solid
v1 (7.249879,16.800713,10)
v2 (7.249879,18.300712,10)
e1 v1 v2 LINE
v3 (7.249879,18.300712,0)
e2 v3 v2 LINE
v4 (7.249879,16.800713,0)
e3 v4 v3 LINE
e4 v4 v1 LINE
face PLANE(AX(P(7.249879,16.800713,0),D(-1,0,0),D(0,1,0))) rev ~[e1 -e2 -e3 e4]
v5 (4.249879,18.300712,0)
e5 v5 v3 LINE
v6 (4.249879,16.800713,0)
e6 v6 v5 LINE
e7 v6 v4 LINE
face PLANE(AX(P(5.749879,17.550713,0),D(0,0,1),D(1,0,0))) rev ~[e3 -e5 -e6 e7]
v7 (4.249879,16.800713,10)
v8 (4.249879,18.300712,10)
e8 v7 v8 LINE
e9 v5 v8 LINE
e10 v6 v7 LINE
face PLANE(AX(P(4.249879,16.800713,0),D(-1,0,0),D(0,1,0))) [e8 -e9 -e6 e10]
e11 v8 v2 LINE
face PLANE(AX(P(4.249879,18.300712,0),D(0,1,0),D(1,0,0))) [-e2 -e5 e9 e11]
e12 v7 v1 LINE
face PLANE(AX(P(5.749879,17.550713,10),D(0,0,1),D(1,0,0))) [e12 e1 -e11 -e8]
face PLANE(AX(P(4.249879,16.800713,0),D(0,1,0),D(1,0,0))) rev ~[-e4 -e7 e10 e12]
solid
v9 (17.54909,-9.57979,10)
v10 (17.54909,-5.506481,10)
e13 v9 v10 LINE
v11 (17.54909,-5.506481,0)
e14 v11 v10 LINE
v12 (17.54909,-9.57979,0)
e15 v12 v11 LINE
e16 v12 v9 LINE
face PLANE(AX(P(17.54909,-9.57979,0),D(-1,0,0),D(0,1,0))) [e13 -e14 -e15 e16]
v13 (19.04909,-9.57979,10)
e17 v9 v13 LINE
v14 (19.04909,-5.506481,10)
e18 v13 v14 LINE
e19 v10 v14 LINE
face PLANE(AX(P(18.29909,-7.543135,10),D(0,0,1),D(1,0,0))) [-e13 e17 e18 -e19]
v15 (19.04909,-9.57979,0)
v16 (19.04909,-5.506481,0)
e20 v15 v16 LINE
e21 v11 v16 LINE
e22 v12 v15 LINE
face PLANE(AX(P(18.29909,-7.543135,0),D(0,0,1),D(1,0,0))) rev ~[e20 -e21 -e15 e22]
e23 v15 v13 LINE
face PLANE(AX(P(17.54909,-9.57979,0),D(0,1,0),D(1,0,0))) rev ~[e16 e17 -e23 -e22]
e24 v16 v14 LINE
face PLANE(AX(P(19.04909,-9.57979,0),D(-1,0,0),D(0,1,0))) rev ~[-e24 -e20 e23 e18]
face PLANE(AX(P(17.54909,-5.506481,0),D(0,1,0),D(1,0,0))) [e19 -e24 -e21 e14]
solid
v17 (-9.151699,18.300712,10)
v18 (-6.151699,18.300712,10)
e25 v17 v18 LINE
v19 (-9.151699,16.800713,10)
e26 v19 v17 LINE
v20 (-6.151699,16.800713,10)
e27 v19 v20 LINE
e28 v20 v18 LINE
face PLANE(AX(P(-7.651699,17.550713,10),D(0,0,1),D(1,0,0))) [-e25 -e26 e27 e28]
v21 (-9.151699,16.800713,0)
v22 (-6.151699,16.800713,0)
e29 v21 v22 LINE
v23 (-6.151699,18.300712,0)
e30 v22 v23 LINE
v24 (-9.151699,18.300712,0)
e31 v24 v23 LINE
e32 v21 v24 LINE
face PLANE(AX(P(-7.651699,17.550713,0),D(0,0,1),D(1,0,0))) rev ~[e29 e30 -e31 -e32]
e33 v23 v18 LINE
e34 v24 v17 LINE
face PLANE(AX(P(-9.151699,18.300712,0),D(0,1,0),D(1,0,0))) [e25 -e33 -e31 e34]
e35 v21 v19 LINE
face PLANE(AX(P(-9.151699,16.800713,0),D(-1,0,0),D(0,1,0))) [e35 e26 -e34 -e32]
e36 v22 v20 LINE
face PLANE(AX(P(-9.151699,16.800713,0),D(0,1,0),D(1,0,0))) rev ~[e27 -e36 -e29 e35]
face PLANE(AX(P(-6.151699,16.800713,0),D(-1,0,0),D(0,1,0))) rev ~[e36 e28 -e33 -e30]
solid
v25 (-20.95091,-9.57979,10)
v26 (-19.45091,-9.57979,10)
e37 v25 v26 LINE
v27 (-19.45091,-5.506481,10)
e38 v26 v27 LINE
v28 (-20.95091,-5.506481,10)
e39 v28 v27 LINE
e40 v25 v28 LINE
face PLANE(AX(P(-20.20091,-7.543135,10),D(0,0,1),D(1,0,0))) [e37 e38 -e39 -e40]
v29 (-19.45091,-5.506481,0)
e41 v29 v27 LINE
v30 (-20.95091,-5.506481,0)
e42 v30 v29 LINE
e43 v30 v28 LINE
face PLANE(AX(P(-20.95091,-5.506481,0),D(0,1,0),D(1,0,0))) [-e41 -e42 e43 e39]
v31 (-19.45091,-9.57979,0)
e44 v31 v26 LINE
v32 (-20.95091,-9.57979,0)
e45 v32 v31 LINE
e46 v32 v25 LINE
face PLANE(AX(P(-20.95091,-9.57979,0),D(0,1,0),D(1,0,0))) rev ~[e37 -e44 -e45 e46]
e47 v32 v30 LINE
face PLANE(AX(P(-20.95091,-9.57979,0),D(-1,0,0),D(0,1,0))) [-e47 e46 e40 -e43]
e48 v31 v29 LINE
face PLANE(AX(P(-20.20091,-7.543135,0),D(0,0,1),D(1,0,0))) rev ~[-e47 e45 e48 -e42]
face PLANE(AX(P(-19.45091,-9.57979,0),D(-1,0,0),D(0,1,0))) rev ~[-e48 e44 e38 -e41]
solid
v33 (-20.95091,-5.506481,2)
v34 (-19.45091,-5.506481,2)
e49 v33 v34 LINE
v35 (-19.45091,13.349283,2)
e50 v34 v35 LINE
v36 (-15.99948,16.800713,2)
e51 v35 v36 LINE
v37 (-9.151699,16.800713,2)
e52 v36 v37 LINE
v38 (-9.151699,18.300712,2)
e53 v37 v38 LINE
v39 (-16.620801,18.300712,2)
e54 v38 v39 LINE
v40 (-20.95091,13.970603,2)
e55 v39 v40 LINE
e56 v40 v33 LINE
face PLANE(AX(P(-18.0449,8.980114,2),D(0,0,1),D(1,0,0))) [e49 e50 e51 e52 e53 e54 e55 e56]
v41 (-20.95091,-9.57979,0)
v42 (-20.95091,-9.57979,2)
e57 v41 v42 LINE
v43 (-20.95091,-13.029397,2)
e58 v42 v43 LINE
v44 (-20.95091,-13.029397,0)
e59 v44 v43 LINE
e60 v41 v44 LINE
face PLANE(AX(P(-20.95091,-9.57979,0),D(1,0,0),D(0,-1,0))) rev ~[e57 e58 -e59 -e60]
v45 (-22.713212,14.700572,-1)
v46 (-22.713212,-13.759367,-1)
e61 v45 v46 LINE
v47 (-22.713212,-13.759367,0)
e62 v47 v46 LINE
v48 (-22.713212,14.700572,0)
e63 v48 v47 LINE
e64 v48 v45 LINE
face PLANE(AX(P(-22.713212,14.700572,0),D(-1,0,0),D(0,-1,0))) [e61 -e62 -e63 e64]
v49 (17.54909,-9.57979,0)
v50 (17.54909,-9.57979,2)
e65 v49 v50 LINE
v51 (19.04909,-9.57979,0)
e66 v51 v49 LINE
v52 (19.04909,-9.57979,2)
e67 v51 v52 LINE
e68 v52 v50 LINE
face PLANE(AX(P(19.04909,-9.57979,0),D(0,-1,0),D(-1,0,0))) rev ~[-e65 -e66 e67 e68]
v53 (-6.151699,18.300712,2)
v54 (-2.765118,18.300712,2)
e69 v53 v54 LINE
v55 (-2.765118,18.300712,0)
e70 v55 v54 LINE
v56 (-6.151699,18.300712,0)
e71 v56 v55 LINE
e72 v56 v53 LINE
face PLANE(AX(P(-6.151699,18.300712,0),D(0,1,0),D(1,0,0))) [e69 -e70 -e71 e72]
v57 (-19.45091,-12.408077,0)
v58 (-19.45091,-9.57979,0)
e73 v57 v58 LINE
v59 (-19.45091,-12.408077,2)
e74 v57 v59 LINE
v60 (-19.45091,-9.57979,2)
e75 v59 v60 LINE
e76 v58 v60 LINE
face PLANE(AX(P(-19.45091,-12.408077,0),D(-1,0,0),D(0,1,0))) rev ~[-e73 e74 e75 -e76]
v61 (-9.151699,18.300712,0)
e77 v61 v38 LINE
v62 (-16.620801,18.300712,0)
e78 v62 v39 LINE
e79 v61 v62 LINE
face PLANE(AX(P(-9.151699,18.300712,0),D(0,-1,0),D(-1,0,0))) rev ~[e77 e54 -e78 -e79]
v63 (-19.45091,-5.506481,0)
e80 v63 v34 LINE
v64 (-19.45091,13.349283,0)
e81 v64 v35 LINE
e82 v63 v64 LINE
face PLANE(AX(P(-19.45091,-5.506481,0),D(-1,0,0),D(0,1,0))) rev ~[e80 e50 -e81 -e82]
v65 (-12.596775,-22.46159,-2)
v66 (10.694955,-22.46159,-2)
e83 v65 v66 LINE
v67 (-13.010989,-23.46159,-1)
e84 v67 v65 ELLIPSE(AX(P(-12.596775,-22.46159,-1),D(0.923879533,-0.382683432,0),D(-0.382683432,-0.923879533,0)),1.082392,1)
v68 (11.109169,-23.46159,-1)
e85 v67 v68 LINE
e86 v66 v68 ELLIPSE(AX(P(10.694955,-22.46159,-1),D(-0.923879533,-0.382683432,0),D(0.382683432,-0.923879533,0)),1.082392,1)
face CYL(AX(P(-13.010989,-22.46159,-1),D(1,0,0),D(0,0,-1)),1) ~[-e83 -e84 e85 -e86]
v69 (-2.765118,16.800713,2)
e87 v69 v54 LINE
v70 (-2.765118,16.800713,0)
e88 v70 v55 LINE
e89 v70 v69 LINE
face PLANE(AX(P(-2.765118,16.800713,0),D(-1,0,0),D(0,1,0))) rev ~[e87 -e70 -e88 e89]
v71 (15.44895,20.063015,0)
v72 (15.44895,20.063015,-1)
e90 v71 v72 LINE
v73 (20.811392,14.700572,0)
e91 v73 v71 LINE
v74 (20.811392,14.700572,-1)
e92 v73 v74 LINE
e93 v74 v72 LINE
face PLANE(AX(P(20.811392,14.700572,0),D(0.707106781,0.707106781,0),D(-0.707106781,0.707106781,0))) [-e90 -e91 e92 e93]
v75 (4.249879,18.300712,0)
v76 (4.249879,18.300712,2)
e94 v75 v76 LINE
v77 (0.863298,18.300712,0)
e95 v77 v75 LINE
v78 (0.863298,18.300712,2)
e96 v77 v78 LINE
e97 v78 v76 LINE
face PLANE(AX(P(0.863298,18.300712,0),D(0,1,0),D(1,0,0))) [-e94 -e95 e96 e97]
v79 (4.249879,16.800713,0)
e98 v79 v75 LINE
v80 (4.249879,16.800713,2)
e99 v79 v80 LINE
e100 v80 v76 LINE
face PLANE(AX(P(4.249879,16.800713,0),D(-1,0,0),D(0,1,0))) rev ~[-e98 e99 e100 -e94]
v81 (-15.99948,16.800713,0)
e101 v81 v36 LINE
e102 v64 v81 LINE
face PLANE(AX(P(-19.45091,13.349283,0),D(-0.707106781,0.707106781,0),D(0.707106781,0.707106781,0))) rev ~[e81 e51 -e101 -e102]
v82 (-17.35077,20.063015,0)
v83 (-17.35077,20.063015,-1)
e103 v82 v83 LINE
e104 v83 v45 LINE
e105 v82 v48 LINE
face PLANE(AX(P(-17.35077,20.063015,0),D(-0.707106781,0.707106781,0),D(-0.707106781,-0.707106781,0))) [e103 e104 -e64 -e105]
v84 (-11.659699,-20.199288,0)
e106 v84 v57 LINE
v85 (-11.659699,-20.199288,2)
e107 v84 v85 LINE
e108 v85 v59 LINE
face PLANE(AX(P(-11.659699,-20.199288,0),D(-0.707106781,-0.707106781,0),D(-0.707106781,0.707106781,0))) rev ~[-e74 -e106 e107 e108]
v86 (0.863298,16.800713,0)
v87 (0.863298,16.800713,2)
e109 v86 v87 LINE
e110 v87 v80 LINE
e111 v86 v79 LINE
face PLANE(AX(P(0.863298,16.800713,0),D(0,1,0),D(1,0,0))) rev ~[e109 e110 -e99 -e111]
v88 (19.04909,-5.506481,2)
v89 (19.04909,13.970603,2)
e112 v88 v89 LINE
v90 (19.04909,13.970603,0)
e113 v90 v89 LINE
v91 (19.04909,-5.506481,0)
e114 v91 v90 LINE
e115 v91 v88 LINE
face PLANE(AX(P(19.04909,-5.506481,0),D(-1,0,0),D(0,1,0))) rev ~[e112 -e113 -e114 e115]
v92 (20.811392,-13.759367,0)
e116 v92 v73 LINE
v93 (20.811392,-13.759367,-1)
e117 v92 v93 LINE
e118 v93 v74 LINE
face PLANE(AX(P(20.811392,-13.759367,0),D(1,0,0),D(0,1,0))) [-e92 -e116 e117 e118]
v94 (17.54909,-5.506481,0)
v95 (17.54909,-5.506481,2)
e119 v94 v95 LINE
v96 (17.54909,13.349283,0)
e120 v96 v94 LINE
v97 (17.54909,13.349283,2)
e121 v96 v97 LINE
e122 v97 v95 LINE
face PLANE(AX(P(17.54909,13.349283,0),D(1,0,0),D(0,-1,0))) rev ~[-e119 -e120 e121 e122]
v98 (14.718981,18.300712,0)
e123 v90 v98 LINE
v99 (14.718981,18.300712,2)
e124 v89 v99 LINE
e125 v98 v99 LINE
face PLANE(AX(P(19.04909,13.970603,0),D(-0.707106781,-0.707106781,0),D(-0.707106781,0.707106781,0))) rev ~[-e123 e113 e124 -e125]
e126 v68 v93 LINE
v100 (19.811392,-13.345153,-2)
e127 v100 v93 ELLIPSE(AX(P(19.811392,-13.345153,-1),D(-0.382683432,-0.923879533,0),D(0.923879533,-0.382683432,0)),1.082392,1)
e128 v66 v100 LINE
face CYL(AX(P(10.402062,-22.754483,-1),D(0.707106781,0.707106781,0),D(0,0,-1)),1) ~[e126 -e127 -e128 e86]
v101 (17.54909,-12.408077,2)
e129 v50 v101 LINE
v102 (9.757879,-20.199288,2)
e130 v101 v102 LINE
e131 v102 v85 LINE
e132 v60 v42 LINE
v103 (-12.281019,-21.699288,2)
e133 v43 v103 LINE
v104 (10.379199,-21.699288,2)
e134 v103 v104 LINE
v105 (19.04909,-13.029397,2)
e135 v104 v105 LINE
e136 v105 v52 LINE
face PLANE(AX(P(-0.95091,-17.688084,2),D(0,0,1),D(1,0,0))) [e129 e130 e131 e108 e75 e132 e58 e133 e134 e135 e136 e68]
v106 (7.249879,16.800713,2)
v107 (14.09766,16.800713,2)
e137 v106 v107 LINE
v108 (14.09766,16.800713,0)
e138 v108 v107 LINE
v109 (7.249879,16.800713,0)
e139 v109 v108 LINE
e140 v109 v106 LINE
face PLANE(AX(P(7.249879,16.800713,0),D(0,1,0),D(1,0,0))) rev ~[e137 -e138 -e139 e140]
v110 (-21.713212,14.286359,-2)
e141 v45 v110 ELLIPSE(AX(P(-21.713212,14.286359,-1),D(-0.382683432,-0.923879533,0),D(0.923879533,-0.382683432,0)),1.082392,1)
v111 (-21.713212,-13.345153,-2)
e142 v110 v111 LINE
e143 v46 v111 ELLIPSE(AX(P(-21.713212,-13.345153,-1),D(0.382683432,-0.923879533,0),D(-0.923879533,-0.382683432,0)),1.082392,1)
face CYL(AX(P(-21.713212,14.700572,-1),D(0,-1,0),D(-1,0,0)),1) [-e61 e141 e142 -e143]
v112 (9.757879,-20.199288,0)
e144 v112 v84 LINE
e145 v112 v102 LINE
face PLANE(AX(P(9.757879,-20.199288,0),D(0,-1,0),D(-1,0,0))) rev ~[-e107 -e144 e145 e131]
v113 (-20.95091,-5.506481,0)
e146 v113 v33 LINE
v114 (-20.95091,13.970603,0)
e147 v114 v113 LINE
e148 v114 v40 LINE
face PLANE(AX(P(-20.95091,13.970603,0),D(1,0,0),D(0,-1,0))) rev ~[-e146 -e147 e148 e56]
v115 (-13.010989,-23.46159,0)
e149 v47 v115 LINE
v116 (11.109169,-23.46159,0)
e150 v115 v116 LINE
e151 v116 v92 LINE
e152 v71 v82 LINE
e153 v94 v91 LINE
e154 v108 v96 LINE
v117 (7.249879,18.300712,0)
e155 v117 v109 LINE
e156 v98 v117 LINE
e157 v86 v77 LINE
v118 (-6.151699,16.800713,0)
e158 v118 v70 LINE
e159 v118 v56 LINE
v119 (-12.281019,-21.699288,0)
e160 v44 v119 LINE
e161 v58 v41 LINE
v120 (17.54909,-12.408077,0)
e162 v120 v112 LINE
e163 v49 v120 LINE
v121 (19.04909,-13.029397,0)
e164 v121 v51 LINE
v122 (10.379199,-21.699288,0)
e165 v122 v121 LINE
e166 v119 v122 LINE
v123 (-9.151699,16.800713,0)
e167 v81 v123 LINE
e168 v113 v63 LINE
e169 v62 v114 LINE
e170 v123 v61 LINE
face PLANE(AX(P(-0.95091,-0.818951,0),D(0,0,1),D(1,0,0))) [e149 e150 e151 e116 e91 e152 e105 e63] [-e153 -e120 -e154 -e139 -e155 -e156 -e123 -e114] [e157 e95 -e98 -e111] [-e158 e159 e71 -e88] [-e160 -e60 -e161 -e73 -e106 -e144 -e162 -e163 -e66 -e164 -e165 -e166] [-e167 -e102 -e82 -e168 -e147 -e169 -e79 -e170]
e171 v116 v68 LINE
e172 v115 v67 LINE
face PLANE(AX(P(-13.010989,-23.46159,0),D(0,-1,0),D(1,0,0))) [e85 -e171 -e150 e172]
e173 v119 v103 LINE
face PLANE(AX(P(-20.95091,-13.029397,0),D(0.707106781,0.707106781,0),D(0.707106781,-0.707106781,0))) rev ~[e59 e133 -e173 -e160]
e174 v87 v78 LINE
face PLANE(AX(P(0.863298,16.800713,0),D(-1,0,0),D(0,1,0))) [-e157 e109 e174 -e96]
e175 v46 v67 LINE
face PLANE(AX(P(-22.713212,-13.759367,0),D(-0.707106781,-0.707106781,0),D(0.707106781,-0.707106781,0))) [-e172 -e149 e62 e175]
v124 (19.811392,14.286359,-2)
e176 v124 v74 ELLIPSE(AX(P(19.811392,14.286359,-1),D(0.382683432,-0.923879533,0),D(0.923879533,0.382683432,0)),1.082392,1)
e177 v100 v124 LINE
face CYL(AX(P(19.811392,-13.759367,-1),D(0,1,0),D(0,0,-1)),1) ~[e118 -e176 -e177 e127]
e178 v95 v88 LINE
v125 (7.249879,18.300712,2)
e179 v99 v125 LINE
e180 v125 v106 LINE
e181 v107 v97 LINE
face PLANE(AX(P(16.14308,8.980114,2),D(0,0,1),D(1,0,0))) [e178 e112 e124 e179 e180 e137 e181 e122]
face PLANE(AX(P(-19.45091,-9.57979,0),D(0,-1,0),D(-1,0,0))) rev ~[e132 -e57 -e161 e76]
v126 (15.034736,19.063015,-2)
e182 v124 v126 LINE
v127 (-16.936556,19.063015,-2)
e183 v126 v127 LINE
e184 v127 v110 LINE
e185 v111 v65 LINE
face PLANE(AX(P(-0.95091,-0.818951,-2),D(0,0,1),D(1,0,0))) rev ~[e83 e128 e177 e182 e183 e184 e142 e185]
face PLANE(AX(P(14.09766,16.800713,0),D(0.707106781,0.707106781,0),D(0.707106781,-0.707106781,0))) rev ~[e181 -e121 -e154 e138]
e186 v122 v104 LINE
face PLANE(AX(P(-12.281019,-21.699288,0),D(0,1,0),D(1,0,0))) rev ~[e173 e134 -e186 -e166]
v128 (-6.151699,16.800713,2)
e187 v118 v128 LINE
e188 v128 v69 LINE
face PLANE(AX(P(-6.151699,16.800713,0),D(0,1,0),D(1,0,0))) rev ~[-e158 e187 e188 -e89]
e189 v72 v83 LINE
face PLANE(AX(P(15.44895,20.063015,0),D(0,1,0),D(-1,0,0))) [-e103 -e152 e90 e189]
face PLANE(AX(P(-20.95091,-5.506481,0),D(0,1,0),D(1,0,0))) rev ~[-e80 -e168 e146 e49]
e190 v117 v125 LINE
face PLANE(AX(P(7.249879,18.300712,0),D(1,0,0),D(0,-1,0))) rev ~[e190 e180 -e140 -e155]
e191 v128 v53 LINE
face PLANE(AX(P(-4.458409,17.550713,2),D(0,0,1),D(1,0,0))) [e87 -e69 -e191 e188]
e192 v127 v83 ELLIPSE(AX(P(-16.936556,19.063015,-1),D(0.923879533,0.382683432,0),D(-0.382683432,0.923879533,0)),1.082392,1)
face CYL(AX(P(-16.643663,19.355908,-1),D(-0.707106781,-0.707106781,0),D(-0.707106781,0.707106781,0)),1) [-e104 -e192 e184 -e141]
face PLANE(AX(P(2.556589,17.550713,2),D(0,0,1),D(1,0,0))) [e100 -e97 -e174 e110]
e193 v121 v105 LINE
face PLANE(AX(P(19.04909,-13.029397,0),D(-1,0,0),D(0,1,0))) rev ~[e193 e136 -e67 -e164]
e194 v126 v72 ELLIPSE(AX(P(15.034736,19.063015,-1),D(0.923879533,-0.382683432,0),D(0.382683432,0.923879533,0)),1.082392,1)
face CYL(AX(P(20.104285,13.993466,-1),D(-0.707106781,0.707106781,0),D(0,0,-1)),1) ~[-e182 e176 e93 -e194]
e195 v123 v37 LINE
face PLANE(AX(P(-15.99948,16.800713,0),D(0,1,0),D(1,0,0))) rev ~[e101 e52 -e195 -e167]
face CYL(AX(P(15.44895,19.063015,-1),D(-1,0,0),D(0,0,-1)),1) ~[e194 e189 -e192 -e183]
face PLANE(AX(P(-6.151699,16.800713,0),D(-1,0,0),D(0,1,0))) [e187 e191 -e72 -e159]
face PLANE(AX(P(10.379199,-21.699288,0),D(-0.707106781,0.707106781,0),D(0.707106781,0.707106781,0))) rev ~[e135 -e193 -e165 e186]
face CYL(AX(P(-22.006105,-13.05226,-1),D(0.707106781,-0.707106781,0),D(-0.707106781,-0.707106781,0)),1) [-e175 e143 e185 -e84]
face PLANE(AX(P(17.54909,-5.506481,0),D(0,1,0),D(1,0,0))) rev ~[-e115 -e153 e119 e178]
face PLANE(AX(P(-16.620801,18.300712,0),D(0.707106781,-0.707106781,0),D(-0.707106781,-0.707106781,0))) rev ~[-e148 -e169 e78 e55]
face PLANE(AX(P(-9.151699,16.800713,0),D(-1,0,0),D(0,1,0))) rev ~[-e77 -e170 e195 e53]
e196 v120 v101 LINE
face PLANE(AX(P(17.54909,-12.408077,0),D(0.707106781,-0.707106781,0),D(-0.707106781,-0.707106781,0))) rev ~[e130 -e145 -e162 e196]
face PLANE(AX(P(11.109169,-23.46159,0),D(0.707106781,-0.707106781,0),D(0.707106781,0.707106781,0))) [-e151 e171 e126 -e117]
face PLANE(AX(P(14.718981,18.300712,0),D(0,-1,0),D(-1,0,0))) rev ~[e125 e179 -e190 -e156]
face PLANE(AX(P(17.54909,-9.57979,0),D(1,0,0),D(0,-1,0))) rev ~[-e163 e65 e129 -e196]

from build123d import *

# Parameters (mm, degrees)
F0_W     = 1.4999995628
F0_H     = 4.0733087808
F0_W_2   = 3
F0_H_2   = 1.4999995628
F0_W_3   = 3.3865806442
F0_W_4   = 3.6284167378
F1_DEPTH = 2
F2_DEPTH = 2
F3_DEPTH = 10
F4_R     = 1


# Not quite as in the source:
# - a feature names something its author has since deleted; it is built from what else it names


with BuildPart() as f1:
    # F0 (on Top) → F1 (new body)
    with BuildSketch(Plane.XY):
        Polygon((-22.7132121537, 14.7005723555), (-22.7132121537, -13.7593665438), (-13.0109889089, -23.4615897885), (11.1091688922, -23.4615897885), (20.811392137, -13.7593665438), (20.811392137, 14.7005723555), (15.4489499903, 20.0630145022), (-17.350770007, 20.0630145022), align=None)
        Polygon((19.0490899916, -13.0293970941), (10.3791994426, -21.6992876432), (-12.2810194593, -21.6992876432), (-20.9509100084, -13.0293970941), (-20.9509100084, -9.5797898248), (-20.9509100084, -5.506481044), (-20.9509100084, 13.9706029059), (-16.6208005574, 18.3007123568), (-9.1516990215, 18.3007123568), (-6.1516990215, 18.3007123568), (-2.7651183773, 18.3007123568), (0.8632983606, 18.3007123568), (4.2498790047, 18.3007123568), (7.2498790047, 18.3007123568), (14.7189805407, 18.3007123568), (19.0490899916, 13.9706029059), (19.0490899916, -5.506481044), (19.0490899916, -9.5797898248), align=None, mode=Mode.SUBTRACT)
        Polygon((-12.2810194593, -21.6992876432), (10.3791994426, -21.6992876432), (19.0490899916, -13.0293970941), (19.0490899916, -9.5797898248), (17.5490904289, -9.5797898248), (17.5490904289, -12.4080769317), (9.7578792802, -20.1992880804), (-11.6596992969, -20.1992880804), (-19.4509104456, -12.4080769317), (-19.4509104456, -9.5797898248), (-20.9509100084, -9.5797898248), (-20.9509100084, -13.0293970941), align=None)
        with Locations((18.2990902103, -7.5431354344)):
            Rectangle(F0_W, F0_H)
        Polygon((17.5490904289, -5.506481044), (19.0490899916, -5.506481044), (19.0490899916, 13.9706029059), (14.7189805407, 18.3007123568), (7.2498790047, 18.3007123568), (7.2498790047, 16.8007127941), (14.0976603782, 16.8007127941), (17.5490904289, 13.3492827434), align=None)
        Polygon((17.5490904289, -12.4080769317), (17.5490904289, -9.5797898248), (17.5490904289, -5.506481044), (17.5490904289, 13.3492827434), (14.0976603782, 16.8007127941), (7.2498790047, 16.8007127941), (4.2498790047, 16.8007127941), (0.8632983606, 16.8007127941), (-2.7651183773, 16.8007127941), (-6.1516990215, 16.8007127941), (-9.1516990215, 16.8007127941), (-15.9994803949, 16.8007127941), (-19.4509104456, 13.3492827434), (-19.4509104456, -5.506481044), (-19.4509104456, -9.5797898248), (-19.4509104456, -12.4080769317), (-11.6596992969, -20.1992880804), (9.7578792802, -20.1992880804), align=None)
        Polygon((-20.9509100084, 13.9706029059), (-20.9509100084, -5.506481044), (-19.4509104456, -5.506481044), (-19.4509104456, 13.3492827434), (-15.9994803949, 16.8007127941), (-9.1516990215, 16.8007127941), (-9.1516990215, 18.3007123568), (-16.6208005574, 18.3007123568), align=None)
        with Locations((-20.200910227, -7.5431354344)):
            Rectangle(F0_W, F0_H)
        with Locations((5.7498790047, 17.5507125754)):
            Rectangle(F0_W_2, F0_H_2)
        with Locations((-4.4584086994, 17.5507125754)):
            Rectangle(F0_W_3, F0_H_2)
        with Locations((-7.6516990215, 17.5507125754)):
            Rectangle(F0_W_2, F0_H_2)
        with Locations((2.5565886827, 17.5507125754)):
            Rectangle(F0_W_3, F0_H_2)
        with Locations((-0.9509100084, 17.5507125754)):
            Rectangle(F0_W_4, F0_H_2)
    extrude(amount=-F1_DEPTH)

    # F0 (on Top) → F2 (join)
    with BuildSketch(Plane.XY):
        Polygon((-12.2810194593, -21.6992876432), (10.3791994426, -21.6992876432), (19.0490899916, -13.0293970941), (19.0490899916, -9.5797898248), (17.5490904289, -9.5797898248), (17.5490904289, -12.4080769317), (9.7578792802, -20.1992880804), (-11.6596992969, -20.1992880804), (-19.4509104456, -12.4080769317), (-19.4509104456, -9.5797898248), (-20.9509100084, -9.5797898248), (-20.9509100084, -13.0293970941), align=None)
        Polygon((-20.9509100084, 13.9706029059), (-20.9509100084, -5.506481044), (-19.4509104456, -5.506481044), (-19.4509104456, 13.3492827434), (-15.9994803949, 16.8007127941), (-9.1516990215, 16.8007127941), (-9.1516990215, 18.3007123568), (-16.6208005574, 18.3007123568), align=None)
        Polygon((17.5490904289, -5.506481044), (19.0490899916, -5.506481044), (19.0490899916, 13.9706029059), (14.7189805407, 18.3007123568), (7.2498790047, 18.3007123568), (7.2498790047, 16.8007127941), (14.0976603782, 16.8007127941), (17.5490904289, 13.3492827434), align=None)
        with Locations((-4.4584086994, 17.5507125754)):
            Rectangle(F0_W_3, F0_H_2)
        with Locations((2.5565886827, 17.5507125754)):
            Rectangle(F0_W_3, F0_H_2)
    extrude(amount=F2_DEPTH)

    # F4
    f4_edges = [f1.edges().sort_by_distance(p)[0] for p in [
        (-22.713212, 0.470603, -2),
        (-17.862101, -18.610478, -2),
        (-0.95091, -23.46159, -2),
        (15.960281, -18.610478, -2),
        (20.811392, 0.470603, -2),
        (18.130171, 17.381793, -2),
        (-0.95091, 20.063015, -2),
        (-20.031991, 17.381793, -2),
    ]]
    fillet(f4_edges, radius=F4_R)


with BuildPart() as f3:
    # F0 (on Top) → F3 (new body)
    with BuildSketch(Plane.XY):
        with Locations((-20.200910227, -7.5431354344)):
            Rectangle(F0_W, F0_H)
    extrude(amount=F3_DEPTH)


with BuildPart() as f3b:
    # F0 (on Top) → F3, piece 2 (new body)
    with BuildSketch(Plane.XY):
        with Locations((18.2990902103, -7.5431354344)):
            Rectangle(F0_W, F0_H)
    extrude(amount=F3_DEPTH)


with BuildPart() as f3c:
    # F0 (on Top) → F3, piece 3 (new body)
    with BuildSketch(Plane.XY):
        with Locations((-7.6516990215, 17.5507125754)):
            Rectangle(F0_W_2, F0_H_2)
    extrude(amount=F3_DEPTH)


with BuildPart() as f3d:
    # F0 (on Top) → F3, piece 4 (new body)
    with BuildSketch(Plane.XY):
        with Locations((5.7498790047, 17.5507125754)):
            Rectangle(F0_W_2, F0_H_2)
    extrude(amount=F3_DEPTH)


solid = Compound([f1.part, f3.part, f3b.part, f3c.part, f3d.part])
